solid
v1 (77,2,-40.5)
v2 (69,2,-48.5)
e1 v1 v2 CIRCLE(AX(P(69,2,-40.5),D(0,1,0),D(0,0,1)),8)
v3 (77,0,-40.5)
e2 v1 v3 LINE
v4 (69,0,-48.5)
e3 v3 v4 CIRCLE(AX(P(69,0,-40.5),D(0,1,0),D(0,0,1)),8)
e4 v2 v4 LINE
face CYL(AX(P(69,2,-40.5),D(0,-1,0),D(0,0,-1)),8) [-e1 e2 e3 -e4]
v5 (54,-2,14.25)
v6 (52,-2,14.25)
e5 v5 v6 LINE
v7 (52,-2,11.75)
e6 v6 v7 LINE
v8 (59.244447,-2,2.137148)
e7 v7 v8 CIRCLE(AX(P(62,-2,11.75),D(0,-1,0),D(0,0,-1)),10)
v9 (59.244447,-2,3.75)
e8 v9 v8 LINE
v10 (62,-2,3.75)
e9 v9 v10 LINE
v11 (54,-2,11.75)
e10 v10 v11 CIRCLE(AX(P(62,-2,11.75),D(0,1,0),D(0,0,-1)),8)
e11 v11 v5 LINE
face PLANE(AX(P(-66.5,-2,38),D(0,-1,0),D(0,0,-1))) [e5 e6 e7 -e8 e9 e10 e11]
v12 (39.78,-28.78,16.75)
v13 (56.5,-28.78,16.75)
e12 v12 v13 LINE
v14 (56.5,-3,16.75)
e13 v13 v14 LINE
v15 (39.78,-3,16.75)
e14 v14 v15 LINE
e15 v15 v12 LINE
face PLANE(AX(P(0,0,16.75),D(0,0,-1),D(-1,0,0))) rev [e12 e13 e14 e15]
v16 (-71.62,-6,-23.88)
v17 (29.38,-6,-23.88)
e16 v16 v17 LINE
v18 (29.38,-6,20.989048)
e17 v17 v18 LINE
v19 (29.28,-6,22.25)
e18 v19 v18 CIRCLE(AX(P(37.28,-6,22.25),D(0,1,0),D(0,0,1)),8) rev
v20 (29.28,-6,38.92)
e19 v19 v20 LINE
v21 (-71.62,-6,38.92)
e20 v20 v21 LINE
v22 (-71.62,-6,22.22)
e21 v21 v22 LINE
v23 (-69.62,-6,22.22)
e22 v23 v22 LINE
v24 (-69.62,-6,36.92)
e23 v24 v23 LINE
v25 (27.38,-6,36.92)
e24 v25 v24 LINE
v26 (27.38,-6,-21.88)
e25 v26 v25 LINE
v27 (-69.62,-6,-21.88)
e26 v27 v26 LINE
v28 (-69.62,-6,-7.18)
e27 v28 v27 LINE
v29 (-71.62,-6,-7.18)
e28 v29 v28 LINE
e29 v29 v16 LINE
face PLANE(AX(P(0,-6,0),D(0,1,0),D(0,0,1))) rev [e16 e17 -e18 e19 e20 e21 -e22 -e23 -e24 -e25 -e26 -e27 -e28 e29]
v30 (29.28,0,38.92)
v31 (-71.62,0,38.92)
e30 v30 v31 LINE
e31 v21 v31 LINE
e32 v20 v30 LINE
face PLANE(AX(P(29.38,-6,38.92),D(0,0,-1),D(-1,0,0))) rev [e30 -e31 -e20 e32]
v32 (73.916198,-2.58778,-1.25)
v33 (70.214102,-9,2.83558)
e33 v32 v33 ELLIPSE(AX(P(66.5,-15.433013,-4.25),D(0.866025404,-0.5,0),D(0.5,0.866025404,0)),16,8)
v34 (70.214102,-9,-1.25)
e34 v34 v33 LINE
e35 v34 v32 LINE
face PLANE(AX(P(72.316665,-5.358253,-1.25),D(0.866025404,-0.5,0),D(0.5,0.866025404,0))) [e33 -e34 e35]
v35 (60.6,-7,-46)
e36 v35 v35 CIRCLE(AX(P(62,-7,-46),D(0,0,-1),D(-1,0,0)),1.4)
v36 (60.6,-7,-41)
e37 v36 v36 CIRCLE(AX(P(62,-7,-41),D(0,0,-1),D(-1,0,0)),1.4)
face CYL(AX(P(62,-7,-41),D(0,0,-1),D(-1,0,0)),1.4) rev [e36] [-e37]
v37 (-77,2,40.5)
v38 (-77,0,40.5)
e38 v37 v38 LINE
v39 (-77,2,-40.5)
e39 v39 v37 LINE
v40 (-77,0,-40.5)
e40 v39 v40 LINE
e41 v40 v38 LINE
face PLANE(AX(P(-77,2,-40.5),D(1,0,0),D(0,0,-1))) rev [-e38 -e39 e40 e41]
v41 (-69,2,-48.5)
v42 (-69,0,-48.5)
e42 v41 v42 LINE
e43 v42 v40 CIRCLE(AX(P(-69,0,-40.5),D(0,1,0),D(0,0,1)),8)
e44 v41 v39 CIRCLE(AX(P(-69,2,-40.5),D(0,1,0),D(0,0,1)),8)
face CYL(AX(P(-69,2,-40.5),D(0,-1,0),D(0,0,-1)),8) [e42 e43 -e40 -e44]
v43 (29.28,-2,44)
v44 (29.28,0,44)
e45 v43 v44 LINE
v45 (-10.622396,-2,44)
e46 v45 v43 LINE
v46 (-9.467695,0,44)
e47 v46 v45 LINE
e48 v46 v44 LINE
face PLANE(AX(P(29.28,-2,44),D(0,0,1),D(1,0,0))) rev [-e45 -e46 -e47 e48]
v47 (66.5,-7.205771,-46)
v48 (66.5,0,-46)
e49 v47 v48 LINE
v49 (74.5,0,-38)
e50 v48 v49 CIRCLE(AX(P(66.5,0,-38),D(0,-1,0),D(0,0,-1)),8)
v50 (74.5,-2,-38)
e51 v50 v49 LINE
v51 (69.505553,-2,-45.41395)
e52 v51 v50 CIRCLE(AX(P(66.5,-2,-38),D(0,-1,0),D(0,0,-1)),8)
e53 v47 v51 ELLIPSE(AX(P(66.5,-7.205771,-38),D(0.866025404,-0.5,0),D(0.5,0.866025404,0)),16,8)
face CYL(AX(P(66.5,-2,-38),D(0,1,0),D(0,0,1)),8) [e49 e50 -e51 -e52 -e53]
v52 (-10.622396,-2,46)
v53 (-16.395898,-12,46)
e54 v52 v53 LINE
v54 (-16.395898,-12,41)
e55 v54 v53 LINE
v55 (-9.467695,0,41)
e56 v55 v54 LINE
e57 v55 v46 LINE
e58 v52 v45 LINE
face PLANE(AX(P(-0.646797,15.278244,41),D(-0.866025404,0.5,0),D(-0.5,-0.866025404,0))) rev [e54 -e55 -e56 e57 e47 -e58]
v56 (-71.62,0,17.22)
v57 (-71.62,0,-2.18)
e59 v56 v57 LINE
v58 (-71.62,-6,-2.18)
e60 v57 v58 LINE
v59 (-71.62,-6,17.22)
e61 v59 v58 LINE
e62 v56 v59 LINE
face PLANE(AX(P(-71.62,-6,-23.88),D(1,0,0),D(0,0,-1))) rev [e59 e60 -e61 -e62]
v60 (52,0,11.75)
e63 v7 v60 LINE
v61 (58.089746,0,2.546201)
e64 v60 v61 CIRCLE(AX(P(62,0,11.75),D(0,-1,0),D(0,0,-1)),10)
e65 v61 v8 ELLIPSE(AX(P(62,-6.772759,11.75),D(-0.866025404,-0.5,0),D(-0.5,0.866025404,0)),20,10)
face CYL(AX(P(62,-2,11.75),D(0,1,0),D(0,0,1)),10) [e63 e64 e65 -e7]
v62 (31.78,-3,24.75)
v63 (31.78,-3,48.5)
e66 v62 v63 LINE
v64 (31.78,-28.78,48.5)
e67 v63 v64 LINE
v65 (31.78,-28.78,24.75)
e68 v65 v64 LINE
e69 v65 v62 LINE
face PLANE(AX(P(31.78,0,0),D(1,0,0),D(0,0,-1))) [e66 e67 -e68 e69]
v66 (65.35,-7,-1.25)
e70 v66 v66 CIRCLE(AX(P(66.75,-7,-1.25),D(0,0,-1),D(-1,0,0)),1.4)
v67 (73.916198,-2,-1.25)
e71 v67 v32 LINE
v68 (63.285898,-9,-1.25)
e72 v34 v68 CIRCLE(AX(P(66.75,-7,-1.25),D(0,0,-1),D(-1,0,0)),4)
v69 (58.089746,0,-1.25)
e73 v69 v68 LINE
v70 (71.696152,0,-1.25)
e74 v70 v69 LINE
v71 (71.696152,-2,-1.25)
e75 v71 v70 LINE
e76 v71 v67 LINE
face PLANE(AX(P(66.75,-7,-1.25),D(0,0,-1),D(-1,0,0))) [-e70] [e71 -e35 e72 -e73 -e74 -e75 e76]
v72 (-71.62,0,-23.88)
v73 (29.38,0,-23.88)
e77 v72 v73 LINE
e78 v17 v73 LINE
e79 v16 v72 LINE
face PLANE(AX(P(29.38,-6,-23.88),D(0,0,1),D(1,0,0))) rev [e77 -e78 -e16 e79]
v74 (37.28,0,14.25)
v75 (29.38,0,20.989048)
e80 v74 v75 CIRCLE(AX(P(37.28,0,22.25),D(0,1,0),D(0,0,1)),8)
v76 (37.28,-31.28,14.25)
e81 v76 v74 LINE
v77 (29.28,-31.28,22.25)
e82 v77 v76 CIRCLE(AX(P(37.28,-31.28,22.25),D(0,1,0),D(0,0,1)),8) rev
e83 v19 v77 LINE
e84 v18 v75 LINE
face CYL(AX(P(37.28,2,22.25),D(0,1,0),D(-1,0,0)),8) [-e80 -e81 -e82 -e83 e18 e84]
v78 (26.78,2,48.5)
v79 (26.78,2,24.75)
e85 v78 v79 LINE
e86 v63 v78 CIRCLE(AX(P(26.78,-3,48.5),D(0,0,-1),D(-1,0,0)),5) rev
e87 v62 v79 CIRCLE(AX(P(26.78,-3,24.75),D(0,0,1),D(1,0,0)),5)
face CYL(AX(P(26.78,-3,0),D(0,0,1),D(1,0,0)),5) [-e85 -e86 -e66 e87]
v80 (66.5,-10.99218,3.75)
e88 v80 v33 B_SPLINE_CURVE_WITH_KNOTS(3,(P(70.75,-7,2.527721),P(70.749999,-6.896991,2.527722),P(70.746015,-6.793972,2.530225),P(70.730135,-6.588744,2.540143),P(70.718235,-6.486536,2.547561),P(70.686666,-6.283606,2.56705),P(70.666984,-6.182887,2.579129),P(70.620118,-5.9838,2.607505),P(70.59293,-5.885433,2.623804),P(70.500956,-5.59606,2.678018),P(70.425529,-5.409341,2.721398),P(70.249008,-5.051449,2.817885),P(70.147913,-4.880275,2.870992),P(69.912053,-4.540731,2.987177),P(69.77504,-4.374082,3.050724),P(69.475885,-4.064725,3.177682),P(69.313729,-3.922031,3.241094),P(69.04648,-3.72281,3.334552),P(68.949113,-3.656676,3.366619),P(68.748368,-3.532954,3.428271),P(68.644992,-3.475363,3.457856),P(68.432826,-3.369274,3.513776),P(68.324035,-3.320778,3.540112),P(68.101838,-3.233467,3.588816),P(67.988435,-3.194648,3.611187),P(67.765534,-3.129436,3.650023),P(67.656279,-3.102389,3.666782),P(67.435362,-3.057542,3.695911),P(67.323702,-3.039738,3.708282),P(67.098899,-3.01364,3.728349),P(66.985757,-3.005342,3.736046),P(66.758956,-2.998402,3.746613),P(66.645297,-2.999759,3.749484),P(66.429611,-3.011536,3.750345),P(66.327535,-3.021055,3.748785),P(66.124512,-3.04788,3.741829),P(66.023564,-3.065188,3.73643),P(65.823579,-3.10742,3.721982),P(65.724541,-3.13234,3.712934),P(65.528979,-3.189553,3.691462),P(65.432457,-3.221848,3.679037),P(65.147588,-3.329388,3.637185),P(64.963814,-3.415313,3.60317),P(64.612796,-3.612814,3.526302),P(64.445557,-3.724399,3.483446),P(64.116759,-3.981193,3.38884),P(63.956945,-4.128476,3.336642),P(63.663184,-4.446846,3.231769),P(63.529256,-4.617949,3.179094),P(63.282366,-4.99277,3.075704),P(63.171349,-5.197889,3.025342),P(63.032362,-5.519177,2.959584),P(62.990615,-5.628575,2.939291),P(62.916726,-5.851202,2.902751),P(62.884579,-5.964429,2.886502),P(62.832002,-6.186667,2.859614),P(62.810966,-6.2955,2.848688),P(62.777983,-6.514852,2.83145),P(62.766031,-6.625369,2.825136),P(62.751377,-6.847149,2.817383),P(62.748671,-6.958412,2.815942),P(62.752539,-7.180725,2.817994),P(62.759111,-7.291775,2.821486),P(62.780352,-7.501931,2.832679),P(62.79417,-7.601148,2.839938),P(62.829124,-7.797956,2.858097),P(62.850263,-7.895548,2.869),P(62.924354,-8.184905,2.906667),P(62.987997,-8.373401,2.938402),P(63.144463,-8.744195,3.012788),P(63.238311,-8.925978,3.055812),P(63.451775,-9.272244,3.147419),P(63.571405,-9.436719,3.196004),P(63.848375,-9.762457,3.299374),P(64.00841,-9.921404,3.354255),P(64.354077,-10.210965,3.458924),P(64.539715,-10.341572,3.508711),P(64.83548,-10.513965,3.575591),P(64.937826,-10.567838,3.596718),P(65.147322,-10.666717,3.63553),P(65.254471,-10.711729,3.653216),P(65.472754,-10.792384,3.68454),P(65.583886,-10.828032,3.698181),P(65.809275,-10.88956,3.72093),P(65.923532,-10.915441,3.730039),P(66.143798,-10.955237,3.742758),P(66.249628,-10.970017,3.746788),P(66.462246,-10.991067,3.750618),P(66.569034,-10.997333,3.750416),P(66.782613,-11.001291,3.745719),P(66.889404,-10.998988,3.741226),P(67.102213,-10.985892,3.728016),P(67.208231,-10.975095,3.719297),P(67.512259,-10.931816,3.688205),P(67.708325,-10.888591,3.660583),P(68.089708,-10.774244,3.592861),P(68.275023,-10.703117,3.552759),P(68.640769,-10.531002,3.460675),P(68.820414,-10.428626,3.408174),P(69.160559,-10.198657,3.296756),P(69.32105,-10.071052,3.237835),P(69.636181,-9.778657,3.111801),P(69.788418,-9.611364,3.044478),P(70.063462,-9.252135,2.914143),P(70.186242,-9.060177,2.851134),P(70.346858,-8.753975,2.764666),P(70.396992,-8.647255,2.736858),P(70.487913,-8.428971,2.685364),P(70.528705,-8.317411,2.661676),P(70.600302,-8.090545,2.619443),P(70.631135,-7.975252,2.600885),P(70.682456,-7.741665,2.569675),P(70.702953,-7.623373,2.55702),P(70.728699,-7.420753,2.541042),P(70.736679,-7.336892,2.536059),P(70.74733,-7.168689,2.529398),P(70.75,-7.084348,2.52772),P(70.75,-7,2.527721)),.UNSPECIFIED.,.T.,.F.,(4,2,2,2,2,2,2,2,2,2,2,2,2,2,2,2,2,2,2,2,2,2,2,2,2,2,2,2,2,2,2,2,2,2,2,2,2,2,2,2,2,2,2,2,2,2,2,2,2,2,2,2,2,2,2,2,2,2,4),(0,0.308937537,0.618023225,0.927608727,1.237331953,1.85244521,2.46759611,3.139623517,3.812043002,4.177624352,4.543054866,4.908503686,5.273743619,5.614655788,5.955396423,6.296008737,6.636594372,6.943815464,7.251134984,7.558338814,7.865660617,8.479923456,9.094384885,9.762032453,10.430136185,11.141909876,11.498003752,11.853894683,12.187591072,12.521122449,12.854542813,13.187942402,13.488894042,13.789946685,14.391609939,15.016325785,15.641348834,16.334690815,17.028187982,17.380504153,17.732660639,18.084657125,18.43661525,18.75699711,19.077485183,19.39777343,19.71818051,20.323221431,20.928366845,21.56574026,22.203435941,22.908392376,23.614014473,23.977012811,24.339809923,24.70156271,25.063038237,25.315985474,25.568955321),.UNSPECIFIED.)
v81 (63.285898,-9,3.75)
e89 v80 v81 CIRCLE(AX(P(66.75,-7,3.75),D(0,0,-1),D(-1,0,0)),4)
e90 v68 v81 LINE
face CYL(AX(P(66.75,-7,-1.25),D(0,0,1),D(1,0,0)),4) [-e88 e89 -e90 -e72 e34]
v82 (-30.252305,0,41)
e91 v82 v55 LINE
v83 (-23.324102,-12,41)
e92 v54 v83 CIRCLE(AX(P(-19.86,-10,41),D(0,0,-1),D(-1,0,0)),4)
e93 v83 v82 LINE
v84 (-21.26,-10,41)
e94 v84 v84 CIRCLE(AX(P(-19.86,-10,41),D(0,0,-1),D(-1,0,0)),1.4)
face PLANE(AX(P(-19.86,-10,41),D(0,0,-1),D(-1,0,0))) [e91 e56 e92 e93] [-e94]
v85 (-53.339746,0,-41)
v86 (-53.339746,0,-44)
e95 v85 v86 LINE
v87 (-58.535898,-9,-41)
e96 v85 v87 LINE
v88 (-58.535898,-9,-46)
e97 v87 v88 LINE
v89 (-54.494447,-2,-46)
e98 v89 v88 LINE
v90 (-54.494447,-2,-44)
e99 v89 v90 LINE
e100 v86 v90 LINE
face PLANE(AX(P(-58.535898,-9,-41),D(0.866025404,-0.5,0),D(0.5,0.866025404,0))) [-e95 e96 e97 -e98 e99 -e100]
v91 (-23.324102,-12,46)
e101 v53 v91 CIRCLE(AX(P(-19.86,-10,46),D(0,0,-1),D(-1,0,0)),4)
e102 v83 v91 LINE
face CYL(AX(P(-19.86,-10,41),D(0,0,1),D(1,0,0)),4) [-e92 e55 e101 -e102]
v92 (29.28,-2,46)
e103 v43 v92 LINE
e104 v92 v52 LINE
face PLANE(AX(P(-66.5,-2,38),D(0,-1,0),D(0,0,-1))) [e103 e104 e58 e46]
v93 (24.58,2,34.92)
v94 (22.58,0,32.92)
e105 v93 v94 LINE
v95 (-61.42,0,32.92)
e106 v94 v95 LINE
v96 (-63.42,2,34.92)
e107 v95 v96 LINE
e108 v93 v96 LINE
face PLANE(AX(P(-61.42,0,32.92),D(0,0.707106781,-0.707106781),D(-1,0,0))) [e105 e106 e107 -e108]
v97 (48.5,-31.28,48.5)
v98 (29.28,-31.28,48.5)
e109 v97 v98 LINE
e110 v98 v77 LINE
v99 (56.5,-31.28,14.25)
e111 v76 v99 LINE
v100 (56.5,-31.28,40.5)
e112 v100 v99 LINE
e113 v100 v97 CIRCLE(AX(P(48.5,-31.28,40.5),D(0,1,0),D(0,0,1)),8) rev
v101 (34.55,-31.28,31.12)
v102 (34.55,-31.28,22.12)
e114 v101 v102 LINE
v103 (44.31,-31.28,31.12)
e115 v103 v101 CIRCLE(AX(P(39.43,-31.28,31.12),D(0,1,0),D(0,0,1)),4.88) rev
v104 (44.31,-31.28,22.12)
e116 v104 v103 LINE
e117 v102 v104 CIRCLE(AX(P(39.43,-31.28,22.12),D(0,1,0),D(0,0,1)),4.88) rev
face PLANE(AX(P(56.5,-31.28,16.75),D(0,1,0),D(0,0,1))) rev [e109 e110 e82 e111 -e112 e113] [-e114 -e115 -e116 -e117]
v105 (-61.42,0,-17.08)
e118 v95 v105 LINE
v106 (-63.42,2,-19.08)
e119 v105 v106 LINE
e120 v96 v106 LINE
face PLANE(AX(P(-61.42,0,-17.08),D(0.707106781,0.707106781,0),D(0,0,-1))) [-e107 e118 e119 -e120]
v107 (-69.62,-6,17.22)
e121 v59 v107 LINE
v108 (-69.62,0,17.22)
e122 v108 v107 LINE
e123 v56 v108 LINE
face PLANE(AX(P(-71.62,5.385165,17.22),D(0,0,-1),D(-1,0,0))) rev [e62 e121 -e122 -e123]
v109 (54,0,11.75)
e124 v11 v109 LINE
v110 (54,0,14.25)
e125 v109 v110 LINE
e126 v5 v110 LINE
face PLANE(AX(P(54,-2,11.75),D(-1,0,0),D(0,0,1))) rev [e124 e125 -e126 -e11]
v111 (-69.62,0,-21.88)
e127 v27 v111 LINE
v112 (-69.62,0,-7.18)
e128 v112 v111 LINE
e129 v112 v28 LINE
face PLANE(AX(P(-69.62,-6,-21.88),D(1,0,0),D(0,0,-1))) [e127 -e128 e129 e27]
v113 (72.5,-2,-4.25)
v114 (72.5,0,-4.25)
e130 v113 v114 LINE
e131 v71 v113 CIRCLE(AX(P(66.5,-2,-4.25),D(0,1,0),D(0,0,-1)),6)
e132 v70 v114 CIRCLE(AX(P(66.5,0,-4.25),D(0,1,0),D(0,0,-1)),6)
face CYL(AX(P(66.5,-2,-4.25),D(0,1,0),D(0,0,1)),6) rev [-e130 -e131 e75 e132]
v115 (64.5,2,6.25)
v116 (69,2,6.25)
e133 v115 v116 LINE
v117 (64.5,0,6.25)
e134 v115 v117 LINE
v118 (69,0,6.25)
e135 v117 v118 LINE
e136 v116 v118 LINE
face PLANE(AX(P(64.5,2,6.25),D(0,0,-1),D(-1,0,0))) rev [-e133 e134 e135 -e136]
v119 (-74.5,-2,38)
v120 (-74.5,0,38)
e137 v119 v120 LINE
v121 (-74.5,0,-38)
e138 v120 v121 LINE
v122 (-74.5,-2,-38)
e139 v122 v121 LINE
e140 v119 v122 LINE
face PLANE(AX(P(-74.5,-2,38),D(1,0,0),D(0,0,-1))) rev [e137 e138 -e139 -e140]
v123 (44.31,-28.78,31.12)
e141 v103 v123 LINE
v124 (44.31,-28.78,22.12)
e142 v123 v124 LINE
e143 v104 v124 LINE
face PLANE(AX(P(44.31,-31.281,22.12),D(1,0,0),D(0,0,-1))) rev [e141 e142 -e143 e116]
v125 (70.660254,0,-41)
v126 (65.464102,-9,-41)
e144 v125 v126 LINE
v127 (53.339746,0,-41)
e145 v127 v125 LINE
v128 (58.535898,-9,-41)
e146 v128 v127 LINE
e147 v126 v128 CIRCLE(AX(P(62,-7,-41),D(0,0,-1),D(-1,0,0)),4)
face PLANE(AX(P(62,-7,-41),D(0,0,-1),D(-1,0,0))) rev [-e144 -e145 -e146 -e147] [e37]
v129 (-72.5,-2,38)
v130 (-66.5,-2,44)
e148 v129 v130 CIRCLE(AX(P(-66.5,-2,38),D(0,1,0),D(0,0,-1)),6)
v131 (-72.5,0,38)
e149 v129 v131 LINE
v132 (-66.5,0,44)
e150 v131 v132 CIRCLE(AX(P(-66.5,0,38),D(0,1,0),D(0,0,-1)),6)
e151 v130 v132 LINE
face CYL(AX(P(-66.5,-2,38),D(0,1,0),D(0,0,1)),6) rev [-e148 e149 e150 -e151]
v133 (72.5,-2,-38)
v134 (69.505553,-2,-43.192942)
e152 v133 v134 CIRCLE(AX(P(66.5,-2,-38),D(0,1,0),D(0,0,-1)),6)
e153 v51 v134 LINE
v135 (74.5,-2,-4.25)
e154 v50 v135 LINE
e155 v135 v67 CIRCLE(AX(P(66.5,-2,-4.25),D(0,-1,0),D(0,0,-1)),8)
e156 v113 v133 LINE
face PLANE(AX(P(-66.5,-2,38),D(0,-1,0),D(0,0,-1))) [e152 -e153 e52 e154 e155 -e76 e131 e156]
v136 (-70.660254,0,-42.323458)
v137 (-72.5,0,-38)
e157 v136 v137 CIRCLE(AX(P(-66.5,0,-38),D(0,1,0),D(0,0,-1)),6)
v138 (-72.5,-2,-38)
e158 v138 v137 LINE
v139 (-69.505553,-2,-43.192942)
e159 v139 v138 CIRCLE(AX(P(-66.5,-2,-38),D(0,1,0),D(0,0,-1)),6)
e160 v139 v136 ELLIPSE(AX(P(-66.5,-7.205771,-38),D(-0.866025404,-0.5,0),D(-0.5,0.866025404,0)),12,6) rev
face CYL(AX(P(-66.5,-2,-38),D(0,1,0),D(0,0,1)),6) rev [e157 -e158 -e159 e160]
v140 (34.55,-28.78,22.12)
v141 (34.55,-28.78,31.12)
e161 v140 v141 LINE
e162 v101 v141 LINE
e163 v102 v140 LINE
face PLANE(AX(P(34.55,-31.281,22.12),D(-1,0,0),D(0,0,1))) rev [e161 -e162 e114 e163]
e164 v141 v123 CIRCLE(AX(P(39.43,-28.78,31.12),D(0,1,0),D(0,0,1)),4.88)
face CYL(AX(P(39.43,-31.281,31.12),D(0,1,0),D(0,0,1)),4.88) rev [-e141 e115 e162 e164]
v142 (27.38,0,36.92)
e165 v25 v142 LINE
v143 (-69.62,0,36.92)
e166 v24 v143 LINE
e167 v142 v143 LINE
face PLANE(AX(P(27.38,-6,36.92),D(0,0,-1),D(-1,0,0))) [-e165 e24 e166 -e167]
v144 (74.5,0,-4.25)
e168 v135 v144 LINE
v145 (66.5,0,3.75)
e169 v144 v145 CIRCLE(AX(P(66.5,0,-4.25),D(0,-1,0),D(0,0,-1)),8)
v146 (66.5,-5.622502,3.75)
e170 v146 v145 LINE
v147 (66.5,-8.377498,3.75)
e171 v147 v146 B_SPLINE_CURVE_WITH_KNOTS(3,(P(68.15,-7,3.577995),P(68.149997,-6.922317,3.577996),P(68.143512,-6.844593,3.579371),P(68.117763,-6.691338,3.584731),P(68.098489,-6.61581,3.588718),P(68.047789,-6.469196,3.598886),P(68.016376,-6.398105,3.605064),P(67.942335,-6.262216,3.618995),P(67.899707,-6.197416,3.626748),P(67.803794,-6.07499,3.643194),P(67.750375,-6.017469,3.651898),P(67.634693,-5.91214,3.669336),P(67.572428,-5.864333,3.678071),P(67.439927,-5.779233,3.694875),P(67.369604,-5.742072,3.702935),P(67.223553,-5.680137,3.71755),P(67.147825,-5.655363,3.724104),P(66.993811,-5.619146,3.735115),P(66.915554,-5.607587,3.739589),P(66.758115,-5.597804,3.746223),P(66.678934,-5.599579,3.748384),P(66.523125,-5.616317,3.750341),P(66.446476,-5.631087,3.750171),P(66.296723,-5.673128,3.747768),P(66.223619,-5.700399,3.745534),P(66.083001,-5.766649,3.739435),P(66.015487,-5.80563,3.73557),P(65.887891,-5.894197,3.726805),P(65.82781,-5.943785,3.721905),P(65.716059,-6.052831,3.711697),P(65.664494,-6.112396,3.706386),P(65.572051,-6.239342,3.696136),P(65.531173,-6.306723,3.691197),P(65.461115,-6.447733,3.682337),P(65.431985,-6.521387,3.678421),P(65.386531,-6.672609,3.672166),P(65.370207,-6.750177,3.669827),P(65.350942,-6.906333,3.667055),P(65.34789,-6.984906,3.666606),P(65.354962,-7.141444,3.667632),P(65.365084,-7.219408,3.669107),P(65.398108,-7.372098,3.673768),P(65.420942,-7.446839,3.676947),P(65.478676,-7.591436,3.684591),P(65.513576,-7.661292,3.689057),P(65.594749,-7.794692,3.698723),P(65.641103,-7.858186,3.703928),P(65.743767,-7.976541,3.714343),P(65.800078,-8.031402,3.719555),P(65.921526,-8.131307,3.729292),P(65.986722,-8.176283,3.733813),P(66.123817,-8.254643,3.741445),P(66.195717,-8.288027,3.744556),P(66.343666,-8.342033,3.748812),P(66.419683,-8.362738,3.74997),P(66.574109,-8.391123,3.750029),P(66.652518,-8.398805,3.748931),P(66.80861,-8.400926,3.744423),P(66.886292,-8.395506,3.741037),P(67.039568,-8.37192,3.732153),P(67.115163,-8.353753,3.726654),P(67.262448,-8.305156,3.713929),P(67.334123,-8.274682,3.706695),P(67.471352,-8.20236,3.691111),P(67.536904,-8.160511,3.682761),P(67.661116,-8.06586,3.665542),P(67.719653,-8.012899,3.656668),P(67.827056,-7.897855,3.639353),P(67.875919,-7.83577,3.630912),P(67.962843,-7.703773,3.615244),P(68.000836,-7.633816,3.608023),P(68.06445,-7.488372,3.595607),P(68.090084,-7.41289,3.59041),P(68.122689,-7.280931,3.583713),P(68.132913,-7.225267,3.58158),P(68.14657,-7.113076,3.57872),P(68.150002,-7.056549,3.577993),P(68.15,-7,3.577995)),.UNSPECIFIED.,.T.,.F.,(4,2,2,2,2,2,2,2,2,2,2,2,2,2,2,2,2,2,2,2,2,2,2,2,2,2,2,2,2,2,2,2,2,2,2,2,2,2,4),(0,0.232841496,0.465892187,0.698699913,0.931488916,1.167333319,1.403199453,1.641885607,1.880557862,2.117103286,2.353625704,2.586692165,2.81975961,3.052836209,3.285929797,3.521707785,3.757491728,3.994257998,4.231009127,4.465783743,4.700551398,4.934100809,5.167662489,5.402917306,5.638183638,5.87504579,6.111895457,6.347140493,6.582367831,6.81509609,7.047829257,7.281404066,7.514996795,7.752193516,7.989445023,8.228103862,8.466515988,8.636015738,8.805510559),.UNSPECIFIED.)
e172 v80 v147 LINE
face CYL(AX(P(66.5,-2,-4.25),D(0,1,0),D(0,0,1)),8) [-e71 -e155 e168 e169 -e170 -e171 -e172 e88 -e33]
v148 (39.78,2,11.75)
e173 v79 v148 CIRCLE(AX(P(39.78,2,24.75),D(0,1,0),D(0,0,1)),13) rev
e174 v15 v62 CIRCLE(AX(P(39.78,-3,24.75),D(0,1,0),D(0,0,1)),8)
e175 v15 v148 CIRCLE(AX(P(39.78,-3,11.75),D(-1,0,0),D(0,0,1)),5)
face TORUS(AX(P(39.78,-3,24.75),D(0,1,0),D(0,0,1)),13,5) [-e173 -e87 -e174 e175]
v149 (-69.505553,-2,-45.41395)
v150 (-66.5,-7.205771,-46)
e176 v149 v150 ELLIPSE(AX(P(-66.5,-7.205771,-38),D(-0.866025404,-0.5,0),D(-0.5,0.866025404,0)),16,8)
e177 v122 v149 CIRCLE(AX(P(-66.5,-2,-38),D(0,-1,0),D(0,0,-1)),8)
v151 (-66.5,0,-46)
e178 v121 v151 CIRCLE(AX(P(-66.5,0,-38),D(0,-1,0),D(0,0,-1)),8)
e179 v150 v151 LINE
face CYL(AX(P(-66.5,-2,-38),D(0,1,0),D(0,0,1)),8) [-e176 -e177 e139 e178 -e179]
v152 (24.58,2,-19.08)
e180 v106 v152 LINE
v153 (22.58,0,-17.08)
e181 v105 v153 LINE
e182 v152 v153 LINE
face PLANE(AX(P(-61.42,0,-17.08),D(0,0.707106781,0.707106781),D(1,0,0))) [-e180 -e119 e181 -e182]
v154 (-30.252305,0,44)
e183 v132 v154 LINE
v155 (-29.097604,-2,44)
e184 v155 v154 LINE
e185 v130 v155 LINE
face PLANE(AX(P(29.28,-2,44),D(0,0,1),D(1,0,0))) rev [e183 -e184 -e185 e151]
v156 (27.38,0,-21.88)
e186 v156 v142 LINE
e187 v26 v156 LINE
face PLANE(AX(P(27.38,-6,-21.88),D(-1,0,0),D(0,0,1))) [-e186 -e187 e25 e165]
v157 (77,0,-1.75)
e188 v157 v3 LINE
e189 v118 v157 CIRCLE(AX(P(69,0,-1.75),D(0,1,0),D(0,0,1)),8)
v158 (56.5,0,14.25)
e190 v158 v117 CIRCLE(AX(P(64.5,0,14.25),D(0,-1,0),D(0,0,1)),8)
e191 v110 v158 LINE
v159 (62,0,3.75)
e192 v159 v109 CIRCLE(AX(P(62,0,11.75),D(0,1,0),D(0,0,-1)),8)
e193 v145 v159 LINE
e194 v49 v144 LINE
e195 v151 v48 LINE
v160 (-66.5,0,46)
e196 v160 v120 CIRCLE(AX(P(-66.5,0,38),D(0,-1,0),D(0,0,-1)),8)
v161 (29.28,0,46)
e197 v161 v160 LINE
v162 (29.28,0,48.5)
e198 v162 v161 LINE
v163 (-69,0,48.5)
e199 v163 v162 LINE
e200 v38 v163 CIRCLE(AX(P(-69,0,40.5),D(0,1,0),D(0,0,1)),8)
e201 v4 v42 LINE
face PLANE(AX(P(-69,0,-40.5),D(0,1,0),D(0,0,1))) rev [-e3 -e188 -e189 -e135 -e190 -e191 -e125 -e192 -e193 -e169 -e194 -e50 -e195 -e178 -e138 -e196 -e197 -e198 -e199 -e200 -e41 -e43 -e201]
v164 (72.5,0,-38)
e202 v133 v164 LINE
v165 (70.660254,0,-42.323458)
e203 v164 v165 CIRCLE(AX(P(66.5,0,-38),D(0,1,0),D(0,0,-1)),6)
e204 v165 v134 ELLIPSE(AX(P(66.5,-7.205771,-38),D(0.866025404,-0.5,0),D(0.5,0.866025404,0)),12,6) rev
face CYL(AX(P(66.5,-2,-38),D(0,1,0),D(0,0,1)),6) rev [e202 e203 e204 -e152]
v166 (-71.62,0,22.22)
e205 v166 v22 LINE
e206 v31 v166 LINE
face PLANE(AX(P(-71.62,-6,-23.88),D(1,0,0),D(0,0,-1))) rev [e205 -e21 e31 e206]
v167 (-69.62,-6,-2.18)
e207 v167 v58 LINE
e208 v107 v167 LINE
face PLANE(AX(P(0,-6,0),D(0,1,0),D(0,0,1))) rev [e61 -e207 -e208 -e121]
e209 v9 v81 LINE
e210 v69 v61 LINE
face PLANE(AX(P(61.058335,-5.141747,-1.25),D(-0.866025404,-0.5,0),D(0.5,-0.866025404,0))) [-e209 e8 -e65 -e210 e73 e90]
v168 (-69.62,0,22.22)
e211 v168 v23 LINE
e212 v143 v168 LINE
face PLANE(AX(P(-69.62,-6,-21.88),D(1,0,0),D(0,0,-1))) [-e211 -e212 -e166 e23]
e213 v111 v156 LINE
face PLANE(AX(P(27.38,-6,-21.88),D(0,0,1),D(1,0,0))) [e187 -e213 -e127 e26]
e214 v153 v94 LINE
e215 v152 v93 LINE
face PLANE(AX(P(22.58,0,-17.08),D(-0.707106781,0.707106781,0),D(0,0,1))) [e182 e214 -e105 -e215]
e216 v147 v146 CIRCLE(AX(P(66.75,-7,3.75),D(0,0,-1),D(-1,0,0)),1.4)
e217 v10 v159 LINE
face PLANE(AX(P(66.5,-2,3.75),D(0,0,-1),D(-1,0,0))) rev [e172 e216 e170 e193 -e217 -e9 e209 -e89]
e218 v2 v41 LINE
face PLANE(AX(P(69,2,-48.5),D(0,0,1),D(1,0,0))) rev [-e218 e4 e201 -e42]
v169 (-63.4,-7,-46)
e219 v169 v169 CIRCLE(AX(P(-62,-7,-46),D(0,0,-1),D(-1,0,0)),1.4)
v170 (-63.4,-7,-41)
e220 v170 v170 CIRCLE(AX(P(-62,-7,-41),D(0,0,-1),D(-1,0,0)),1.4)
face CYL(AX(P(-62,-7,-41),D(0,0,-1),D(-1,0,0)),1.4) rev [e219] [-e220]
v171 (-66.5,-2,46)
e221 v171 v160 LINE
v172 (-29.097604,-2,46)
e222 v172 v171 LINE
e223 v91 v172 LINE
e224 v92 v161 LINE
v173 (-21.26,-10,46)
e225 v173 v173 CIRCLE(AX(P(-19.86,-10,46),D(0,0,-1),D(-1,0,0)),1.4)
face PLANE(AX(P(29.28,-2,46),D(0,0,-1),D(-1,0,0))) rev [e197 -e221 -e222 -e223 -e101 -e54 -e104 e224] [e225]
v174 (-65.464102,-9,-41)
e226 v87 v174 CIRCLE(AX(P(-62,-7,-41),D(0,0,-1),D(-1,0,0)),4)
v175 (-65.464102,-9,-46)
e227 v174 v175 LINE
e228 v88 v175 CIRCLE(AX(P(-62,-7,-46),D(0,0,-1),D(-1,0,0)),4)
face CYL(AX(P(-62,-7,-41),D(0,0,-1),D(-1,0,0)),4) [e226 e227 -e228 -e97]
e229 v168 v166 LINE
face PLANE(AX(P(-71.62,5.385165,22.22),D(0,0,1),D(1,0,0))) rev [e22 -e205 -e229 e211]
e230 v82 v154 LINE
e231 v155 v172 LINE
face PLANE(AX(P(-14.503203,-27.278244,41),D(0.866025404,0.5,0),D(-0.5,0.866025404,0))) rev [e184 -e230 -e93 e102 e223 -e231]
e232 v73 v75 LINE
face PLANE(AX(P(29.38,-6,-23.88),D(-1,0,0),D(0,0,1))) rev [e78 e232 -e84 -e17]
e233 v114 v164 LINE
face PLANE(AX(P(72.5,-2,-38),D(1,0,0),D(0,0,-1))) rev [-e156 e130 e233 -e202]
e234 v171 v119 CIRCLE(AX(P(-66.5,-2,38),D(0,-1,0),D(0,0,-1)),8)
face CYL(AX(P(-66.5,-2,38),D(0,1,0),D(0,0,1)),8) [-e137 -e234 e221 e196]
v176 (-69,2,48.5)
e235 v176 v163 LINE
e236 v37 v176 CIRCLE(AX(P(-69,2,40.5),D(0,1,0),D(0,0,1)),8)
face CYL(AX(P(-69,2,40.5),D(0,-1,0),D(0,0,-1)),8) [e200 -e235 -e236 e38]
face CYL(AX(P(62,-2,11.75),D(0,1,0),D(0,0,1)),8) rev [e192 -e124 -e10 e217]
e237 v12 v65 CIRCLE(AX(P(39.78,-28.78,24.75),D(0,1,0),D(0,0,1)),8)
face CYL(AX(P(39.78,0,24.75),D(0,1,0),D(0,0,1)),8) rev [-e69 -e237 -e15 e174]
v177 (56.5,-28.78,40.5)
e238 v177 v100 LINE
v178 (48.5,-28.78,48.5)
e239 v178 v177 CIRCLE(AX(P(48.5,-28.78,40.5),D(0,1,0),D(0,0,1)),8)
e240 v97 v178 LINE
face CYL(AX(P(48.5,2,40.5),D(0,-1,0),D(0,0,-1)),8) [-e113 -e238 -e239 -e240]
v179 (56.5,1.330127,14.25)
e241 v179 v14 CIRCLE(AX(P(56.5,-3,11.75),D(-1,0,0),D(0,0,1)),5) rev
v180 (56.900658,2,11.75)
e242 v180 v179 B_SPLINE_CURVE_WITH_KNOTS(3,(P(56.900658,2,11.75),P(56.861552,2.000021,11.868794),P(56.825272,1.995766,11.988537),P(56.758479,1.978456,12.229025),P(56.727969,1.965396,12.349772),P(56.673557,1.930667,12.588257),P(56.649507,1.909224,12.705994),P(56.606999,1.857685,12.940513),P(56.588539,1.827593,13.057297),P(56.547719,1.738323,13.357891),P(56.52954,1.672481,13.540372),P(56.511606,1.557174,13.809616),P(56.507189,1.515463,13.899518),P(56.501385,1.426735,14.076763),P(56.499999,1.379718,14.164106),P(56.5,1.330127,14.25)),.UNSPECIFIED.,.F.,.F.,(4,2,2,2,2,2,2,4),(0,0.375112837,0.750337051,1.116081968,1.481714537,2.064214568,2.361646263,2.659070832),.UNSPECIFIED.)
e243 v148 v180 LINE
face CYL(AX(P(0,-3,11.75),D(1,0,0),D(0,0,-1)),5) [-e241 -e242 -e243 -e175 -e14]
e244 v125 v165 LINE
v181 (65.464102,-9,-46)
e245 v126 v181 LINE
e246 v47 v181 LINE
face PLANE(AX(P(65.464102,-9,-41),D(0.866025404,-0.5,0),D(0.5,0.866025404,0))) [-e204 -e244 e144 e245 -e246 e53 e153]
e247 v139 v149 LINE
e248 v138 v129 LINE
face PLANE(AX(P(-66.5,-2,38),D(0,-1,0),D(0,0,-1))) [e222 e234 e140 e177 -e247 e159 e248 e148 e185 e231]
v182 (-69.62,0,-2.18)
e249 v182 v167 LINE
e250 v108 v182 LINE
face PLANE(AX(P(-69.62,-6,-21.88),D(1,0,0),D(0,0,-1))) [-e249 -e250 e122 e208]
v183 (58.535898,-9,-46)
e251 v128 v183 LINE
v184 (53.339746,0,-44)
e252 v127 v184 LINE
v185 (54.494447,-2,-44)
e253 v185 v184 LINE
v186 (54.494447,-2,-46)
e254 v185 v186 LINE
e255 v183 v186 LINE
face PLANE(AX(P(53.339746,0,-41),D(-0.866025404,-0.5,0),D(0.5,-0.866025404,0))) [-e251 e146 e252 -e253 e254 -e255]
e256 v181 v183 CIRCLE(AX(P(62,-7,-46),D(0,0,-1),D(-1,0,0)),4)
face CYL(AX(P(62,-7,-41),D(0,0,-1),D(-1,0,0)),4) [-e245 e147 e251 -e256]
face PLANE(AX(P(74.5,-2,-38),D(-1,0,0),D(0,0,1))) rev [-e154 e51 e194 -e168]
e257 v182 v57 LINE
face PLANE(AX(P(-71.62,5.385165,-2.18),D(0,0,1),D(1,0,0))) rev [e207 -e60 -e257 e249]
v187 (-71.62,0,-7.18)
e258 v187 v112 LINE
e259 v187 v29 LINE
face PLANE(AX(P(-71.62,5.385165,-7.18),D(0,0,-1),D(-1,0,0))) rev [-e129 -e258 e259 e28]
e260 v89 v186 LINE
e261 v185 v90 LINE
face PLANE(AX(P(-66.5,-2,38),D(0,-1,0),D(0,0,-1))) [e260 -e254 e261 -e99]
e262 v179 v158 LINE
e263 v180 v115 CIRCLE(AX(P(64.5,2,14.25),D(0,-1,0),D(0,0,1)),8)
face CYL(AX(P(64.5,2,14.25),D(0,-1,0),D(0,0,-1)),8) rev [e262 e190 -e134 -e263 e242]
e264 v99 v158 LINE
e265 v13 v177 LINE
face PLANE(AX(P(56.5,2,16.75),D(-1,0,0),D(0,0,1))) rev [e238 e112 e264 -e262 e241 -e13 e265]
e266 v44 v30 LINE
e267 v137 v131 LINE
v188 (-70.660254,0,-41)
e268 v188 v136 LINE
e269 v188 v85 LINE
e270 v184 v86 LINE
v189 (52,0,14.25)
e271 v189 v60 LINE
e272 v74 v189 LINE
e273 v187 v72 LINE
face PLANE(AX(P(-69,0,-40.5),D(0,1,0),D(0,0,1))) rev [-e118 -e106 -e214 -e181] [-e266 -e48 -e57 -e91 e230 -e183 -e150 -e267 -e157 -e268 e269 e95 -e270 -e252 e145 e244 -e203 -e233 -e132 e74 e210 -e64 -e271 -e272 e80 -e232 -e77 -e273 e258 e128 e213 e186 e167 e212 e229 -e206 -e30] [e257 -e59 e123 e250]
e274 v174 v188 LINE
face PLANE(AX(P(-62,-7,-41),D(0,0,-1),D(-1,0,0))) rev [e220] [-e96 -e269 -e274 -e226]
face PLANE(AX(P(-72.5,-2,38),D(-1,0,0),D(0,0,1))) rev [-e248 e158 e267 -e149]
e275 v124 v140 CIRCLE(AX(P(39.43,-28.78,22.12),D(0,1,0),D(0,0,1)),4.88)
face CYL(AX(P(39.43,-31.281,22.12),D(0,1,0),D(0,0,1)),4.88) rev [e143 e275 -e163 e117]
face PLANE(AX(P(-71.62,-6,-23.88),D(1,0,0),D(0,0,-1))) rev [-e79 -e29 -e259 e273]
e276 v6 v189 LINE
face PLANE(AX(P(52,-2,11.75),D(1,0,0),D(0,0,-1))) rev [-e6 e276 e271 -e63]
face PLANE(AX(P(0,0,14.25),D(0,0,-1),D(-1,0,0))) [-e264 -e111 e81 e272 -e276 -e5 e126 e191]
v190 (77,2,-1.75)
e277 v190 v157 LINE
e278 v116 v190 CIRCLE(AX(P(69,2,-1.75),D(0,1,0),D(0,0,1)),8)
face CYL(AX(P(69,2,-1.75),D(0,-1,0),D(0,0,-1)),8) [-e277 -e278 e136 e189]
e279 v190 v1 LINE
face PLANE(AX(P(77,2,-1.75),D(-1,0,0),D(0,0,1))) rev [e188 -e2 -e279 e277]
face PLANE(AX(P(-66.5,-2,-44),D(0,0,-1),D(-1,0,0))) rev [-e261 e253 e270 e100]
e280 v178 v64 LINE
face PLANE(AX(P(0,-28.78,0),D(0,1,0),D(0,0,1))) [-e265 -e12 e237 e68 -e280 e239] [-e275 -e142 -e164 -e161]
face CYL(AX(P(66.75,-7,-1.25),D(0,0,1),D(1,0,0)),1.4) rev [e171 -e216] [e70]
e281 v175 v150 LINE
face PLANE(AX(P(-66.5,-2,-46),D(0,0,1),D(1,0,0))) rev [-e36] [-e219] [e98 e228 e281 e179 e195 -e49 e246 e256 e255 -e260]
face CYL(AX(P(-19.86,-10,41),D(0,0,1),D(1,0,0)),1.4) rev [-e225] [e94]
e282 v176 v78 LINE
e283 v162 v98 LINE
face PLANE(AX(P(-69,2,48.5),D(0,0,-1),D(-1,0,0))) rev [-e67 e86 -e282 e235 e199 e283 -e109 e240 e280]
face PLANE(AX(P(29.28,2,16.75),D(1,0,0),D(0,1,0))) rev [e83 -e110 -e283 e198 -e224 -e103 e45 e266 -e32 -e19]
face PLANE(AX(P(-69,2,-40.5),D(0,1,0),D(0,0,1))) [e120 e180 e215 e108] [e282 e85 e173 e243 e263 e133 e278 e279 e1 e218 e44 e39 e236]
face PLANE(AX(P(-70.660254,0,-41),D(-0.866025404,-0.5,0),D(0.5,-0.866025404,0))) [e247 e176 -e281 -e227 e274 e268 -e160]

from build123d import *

# Parameters (mm, degrees)
BOSS_EXTRUDE1_DEPTH = 2
BOSS_EXTRUDE2_DEPTH = 2
SKETCH3_W           = 27.22
SKETCH3_H           = 33.28
BOSS_EXTRUDE3_DEPTH = 2.5
SKETCH4_W           = 31.75
SKETCH4_H           = 33.28
BOSS_EXTRUDE4_DEPTH = 2.5
SKETCH5_W           = 27.22
SKETCH5_H           = 34.25
BOSS_EXTRUDE5_DEPTH = 2.5
FILLET1_R           = 8
CUT_EXTRUDE1_REACH  = 98.066
FILLET3_R           = 8
FILLET6_R           = 5
SKETCH7_W           = 101
SKETCH7_H           = 62.8
SKETCH7_W_2         = 97
SKETCH7_H_2         = 58.8
BOSS_EXTRUDE6_DEPTH = 6
CUT_EXTRUDE2_REACH  = 98.896
SKETCH8_W           = 84
SKETCH8_H           = 50
CHAMFER1_SIZE       = 2
BOSS_EXTRUDE7_START = -2.5
SKETCH9_R           = 1.4
BOSS_EXTRUDE7_DEPTH = 5
BOSS_EXTRUDE8_START = 3.75
SKETCH10_R          = 1.4
BOSS_EXTRUDE8_DEPTH = 5
SKETCH11_R          = 1.4
BOSS_EXTRUDE9_DEPTH = 5
CUT_EXTRUDE3_DEPTH  = 97.22727472
SKETCH13_W          = 2
SKETCH13_H          = 5
CUT_EXTRUDE4_DEPTH  = 6


with BuildPart() as part:
    # Sketch1 → Boss-Extrude1 (new body)
    with BuildSketch(Plane(origin=(0, 0, 0), x_dir=(1, 0, 0), z_dir=(0, 1, 0))):
        with BuildLine():
            Line((-77, 40.5), (-77, -40.5))
            ThreePointArc((-77, -40.5), (-74.656854249, -46.156854249), (-69, -48.5))
            Line((-69, -48.5), (29.28, -48.5))
            Line((29.28, -48.5), (29.28, -46))
            Line((29.28, -46), (29.28, -14.25))
            Line((29.28, -14.25), (54, -14.25))
            Line((54, -14.25), (56.5, -14.25))
            ThreePointArc((56.5, -14.25), (58.843145751, -8.593145751), (64.5, -6.25))
            Line((64.5, -6.25), (69, -6.25))
            ThreePointArc((69, -6.25), (74.656854249, -3.906854249), (77, 1.75))
            Line((77, 1.75), (77, 40.5))
            ThreePointArc((77, 40.5), (74.656854249, 46.156854249), (69, 48.5))
            Line((69, 48.5), (-69, 48.5))
            ThreePointArc((-69, 48.5), (-74.656854249, 46.156854249), (-77, 40.5))
        make_face()
    extrude(amount=BOSS_EXTRUDE1_DEPTH)

    # Sketch2 → Boss-Extrude2 (add)
    with BuildSketch(Plane.XZ):
        with BuildLine():
            Line((54, 11.75), (54, 14.25))
            Line((54, 14.25), (52, 14.25))
            Line((52, 14.25), (52, 11.75))
            ThreePointArc((52, 11.75), (54.928932188, 4.678932188), (62, 1.75))
            Line((62, 1.75), (66.5, 1.75))
            ThreePointArc((66.5, 1.75), (70.742640687, -0.007359313), (72.5, -4.25))
            Line((72.5, -4.25), (72.5, -38))
            ThreePointArc((72.5, -38), (70.742640687, -42.242640687), (66.5, -44))
            Line((66.5, -44), (-66.5, -44))
            ThreePointArc((-66.5, -44), (-70.742640687, -42.242640687), (-72.5, -38))
            Line((-72.5, -38), (-72.5, 38))
            ThreePointArc((-72.5, 38), (-70.742640687, 42.242640687), (-66.5, 44))
            Line((-66.5, 44), (29.28, 44))
            Line((29.28, 44), (29.28, 46))
            Line((29.28, 46), (-66.5, 46))
            ThreePointArc((-66.5, 46), (-72.156854249, 43.656854249), (-74.5, 38))
            Line((-74.5, 38), (-74.5, -38))
            ThreePointArc((-74.5, -38), (-72.156854249, -43.656854249), (-66.5, -46))
            Line((-66.5, -46), (66.5, -46))
            ThreePointArc((66.5, -46), (72.156854249, -43.656854249), (74.5, -38))
            Line((74.5, -38), (74.5, -4.25))
            ThreePointArc((74.5, -4.25), (72.156854249, 1.406854249), (66.5, 3.75))
            Line((66.5, 3.75), (62, 3.75))
            ThreePointArc((62, 3.75), (56.343145751, 6.093145751), (54, 11.75))
        make_face()
    extrude(amount=BOSS_EXTRUDE2_DEPTH)

    # Sketch3 → Boss-Extrude3 (add)
    with BuildSketch(Plane.XY.offset(14.25)):
        with Locations((42.89, -14.64)):
            Rectangle(SKETCH3_W, SKETCH3_H)
    extrude(amount=BOSS_EXTRUDE3_DEPTH)

    # Sketch4 → Boss-Extrude4 (add)
    with BuildSketch(Plane(origin=(29.28, 0, 0), x_dir=(0, 0, -1), z_dir=(1, 0, 0))):
        with Locations((-32.625, -14.64)):
            Rectangle(SKETCH4_W, SKETCH4_H)
    extrude(amount=BOSS_EXTRUDE4_DEPTH)

    # Sketch5 → Boss-Extrude5 (add)
    with BuildSketch(Plane.XZ.offset(31.28)):
        with Locations((42.89, 31.375)):
            Rectangle(SKETCH5_W, SKETCH5_H)
    extrude(amount=-BOSS_EXTRUDE5_DEPTH)

    # Fillet1
    fillet1_edges = [part.edges().sort_by_distance(p)[0] for p in [
        (56.5, -30.03, 48.5),
    ]]
    fillet(fillet1_edges, radius=FILLET1_R)

    # Sketch6 → Cut-Extrude1 (cut, up to next)
    with BuildSketch(Plane(origin=(0, -28.78, 0), x_dir=(1, 0, 0), z_dir=(0, 1, 0)), mode=Mode.PRIVATE) as cut_extrude1_sk1:
        with BuildLine():
            Line((44.31, -22.12), (44.31, -31.12))
            ThreePointArc((44.31, -31.12), (39.43, -36), (34.55, -31.12))
            Line((34.55, -31.12), (34.55, -22.12))
            ThreePointArc((34.55, -22.12), (39.43, -17.24), (44.31, -22.12))
        make_face()
    cut_extrude1_tool1 = extrude(cut_extrude1_sk1.sketch, amount=-CUT_EXTRUDE1_REACH, mode=Mode.PRIVATE) & part.part
    add(cut_extrude1_tool1.solids().sort_by_distance((39.43, -28.78, 26.62))[0], mode=Mode.SUBTRACT)

    # Fillet3
    fillet3_edges = [part.edges().sort_by_distance(p)[0] for p in [
        (29.28, -15.64, 14.25),
        (31.78, -13.39, 16.75),
    ]]
    fillet(fillet3_edges, radius=FILLET3_R)

    # Fillet6
    fillet6_edges = [part.edges().sort_by_distance(p)[0] for p in [
        (31.78, 2, 36.625),
        (34.123145751, 2, 19.093145751),
        (48.14, 2, 16.75),
    ]]
    fillet(fillet6_edges, radius=FILLET6_R)

    # Sketch7 → Boss-Extrude6 (add)
    with BuildSketch(Plane.XZ):
        with Locations((-21.12, 7.52)):
            Rectangle(SKETCH7_W, SKETCH7_H)
        with Locations((-21.12, 7.52)):
            Rectangle(SKETCH7_W_2, SKETCH7_H_2, mode=Mode.SUBTRACT)
    extrude(amount=BOSS_EXTRUDE6_DEPTH)

    # Sketch8 → Cut-Extrude2 (cut, up to next)
    with BuildSketch(Plane(origin=(0, 2, 0), x_dir=(1, 0, 0), z_dir=(0, 1, 0)), mode=Mode.PRIVATE) as cut_extrude2_sk1:
        with Locations((-19.42, -7.92)):
            Rectangle(SKETCH8_W, SKETCH8_H)
    cut_extrude2_tool1 = extrude(cut_extrude2_sk1.sketch, amount=-CUT_EXTRUDE2_REACH, mode=Mode.PRIVATE) & part.part
    add(cut_extrude2_tool1.solids().sort_by_distance((-19.42, 2, 7.92))[0], mode=Mode.SUBTRACT)

    # Chamfer1
    chamfer1_edges = [part.edges().sort_by_distance(p)[0] for p in [
        (-19.42, 2, 32.92),
        (-61.42, 2, 7.92),
        (-19.42, 2, -17.08),
        (22.58, 2, 7.92),
    ]]
    chamfer(chamfer1_edges, length=CHAMFER1_SIZE - 0.0001)  # a hair under: the kernel refuses the full size

    # Sketch9 → Boss-Extrude7 (add)
    with BuildSketch(Plane.XY.offset(48.5).offset(BOSS_EXTRUDE7_START)):
        with BuildLine():
            Line((-23.324101615, -12), (-30.252304845, 0))
            Line((-30.252304845, 0), (-9.467695155, 0))
            Line((-9.467695155, 0), (-16.395898385, -12))
            ThreePointArc((-16.395898385, -12), (-19.86, -14), (-23.324101615, -12))
        make_face()
        with Locations(Location((-19.86, -10, 0), (0, 0, 180))):
            Circle(SKETCH9_R, mode=Mode.SUBTRACT)
    extrude(amount=-BOSS_EXTRUDE7_DEPTH)

    # Sketch10 → Boss-Extrude8 (add)
    with BuildSketch(Plane.XY.offset(BOSS_EXTRUDE8_START)):
        with BuildLine():
            Line((70.214101615, -9), (75.410254038, 0))
            Line((75.410254038, 0), (58.089745962, 0))
            Line((58.089745962, 0), (63.285898385, -9))
            ThreePointArc((63.285898385, -9), (66.75, -11), (70.214101615, -9))
        make_face()
        with Locations(Location((66.75, -7, 0), (0, 0, 180))):
            Circle(SKETCH10_R, mode=Mode.SUBTRACT)
    extrude(amount=-BOSS_EXTRUDE8_DEPTH)

    # Sketch11 → Boss-Extrude9 (add)
    # profile 1 of 2: a face of its own
    with BuildSketch(Plane(origin=(0, 0, -46), x_dir=(-1, 0, 0), z_dir=(0, 0, -1))):
        with BuildLine():
            Line((-65.464101615, -9), (-70.660254038, 0))
            Line((-70.660254038, 0), (-53.339745962, 0))
            Line((-53.339745962, 0), (-58.535898385, -9))
            ThreePointArc((-58.535898385, -9), (-62, -11), (-65.464101615, -9))
        make_face()
        with Locations((-62, -7)):
            Circle(SKETCH11_R, mode=Mode.SUBTRACT)
    # profile 2 of 2: a face of its own
    with BuildSketch(Plane(origin=(0, 0, -46), x_dir=(-1, 0, 0), z_dir=(0, 0, -1))):
        with BuildLine():
            Line((58.535898385, -9), (53.339745962, 0))
            Line((53.339745962, 0), (70.660254038, 0))
            Line((70.660254038, 0), (65.464101615, -9))
            ThreePointArc((65.464101615, -9), (62, -11), (58.535898385, -9))
        make_face()
        with Locations((62, -7)):
            Circle(SKETCH11_R, mode=Mode.SUBTRACT)
    extrude(amount=-BOSS_EXTRUDE9_DEPTH)

    # Sketch12 → Cut-Extrude3 (cut, through all)
    with BuildSketch(Plane.XZ):
        with BuildLine():
            Line((-66.5, -46), (66.5, -46))
            ThreePointArc((66.5, -46), (72.156854249, -43.656854249), (74.5, -38))
            Line((74.5, -38), (84.295668918, -38))
            Line((84.295668918, -38), (84.295668918, -62.929633478))
            Line((84.295668918, -62.929633478), (-82.125682446, -61.467965399))
            Line((-82.125682446, -61.467965399), (-82.125682446, -38))
            Line((-82.125682446, -38), (-74.5, -38))
            ThreePointArc((-74.5, -38), (-72.156854249, -43.656854249), (-66.5, -46))
        make_face()
        with BuildLine():
            Line((66.5, 3.75), (62, 3.75))
            ThreePointArc((62, 3.75), (56.343145751, 6.093145751), (54, 11.75))
            Line((54, 11.75), (84.295668918, 11.75))
            Line((84.295668918, 11.75), (84.295668918, -4.25))
            Line((84.295668918, -4.25), (74.5, -4.25))
            ThreePointArc((74.5, -4.25), (72.156854249, 1.406854249), (66.5, 3.75))
        make_face()
    extrude(amount=CUT_EXTRUDE3_DEPTH, mode=Mode.SUBTRACT)

    # Sketch13 → Cut-Extrude4 (cut)
    with BuildSketch(Plane.XZ.offset(6)):
        with Locations((-70.62, 19.72)):
            Rectangle(SKETCH13_W, SKETCH13_H)
        with Locations((-70.62, -4.68)):
            Rectangle(SKETCH13_W, SKETCH13_H)
    extrude(amount=-CUT_EXTRUDE4_DEPTH, mode=Mode.SUBTRACT)


solid = part.part
